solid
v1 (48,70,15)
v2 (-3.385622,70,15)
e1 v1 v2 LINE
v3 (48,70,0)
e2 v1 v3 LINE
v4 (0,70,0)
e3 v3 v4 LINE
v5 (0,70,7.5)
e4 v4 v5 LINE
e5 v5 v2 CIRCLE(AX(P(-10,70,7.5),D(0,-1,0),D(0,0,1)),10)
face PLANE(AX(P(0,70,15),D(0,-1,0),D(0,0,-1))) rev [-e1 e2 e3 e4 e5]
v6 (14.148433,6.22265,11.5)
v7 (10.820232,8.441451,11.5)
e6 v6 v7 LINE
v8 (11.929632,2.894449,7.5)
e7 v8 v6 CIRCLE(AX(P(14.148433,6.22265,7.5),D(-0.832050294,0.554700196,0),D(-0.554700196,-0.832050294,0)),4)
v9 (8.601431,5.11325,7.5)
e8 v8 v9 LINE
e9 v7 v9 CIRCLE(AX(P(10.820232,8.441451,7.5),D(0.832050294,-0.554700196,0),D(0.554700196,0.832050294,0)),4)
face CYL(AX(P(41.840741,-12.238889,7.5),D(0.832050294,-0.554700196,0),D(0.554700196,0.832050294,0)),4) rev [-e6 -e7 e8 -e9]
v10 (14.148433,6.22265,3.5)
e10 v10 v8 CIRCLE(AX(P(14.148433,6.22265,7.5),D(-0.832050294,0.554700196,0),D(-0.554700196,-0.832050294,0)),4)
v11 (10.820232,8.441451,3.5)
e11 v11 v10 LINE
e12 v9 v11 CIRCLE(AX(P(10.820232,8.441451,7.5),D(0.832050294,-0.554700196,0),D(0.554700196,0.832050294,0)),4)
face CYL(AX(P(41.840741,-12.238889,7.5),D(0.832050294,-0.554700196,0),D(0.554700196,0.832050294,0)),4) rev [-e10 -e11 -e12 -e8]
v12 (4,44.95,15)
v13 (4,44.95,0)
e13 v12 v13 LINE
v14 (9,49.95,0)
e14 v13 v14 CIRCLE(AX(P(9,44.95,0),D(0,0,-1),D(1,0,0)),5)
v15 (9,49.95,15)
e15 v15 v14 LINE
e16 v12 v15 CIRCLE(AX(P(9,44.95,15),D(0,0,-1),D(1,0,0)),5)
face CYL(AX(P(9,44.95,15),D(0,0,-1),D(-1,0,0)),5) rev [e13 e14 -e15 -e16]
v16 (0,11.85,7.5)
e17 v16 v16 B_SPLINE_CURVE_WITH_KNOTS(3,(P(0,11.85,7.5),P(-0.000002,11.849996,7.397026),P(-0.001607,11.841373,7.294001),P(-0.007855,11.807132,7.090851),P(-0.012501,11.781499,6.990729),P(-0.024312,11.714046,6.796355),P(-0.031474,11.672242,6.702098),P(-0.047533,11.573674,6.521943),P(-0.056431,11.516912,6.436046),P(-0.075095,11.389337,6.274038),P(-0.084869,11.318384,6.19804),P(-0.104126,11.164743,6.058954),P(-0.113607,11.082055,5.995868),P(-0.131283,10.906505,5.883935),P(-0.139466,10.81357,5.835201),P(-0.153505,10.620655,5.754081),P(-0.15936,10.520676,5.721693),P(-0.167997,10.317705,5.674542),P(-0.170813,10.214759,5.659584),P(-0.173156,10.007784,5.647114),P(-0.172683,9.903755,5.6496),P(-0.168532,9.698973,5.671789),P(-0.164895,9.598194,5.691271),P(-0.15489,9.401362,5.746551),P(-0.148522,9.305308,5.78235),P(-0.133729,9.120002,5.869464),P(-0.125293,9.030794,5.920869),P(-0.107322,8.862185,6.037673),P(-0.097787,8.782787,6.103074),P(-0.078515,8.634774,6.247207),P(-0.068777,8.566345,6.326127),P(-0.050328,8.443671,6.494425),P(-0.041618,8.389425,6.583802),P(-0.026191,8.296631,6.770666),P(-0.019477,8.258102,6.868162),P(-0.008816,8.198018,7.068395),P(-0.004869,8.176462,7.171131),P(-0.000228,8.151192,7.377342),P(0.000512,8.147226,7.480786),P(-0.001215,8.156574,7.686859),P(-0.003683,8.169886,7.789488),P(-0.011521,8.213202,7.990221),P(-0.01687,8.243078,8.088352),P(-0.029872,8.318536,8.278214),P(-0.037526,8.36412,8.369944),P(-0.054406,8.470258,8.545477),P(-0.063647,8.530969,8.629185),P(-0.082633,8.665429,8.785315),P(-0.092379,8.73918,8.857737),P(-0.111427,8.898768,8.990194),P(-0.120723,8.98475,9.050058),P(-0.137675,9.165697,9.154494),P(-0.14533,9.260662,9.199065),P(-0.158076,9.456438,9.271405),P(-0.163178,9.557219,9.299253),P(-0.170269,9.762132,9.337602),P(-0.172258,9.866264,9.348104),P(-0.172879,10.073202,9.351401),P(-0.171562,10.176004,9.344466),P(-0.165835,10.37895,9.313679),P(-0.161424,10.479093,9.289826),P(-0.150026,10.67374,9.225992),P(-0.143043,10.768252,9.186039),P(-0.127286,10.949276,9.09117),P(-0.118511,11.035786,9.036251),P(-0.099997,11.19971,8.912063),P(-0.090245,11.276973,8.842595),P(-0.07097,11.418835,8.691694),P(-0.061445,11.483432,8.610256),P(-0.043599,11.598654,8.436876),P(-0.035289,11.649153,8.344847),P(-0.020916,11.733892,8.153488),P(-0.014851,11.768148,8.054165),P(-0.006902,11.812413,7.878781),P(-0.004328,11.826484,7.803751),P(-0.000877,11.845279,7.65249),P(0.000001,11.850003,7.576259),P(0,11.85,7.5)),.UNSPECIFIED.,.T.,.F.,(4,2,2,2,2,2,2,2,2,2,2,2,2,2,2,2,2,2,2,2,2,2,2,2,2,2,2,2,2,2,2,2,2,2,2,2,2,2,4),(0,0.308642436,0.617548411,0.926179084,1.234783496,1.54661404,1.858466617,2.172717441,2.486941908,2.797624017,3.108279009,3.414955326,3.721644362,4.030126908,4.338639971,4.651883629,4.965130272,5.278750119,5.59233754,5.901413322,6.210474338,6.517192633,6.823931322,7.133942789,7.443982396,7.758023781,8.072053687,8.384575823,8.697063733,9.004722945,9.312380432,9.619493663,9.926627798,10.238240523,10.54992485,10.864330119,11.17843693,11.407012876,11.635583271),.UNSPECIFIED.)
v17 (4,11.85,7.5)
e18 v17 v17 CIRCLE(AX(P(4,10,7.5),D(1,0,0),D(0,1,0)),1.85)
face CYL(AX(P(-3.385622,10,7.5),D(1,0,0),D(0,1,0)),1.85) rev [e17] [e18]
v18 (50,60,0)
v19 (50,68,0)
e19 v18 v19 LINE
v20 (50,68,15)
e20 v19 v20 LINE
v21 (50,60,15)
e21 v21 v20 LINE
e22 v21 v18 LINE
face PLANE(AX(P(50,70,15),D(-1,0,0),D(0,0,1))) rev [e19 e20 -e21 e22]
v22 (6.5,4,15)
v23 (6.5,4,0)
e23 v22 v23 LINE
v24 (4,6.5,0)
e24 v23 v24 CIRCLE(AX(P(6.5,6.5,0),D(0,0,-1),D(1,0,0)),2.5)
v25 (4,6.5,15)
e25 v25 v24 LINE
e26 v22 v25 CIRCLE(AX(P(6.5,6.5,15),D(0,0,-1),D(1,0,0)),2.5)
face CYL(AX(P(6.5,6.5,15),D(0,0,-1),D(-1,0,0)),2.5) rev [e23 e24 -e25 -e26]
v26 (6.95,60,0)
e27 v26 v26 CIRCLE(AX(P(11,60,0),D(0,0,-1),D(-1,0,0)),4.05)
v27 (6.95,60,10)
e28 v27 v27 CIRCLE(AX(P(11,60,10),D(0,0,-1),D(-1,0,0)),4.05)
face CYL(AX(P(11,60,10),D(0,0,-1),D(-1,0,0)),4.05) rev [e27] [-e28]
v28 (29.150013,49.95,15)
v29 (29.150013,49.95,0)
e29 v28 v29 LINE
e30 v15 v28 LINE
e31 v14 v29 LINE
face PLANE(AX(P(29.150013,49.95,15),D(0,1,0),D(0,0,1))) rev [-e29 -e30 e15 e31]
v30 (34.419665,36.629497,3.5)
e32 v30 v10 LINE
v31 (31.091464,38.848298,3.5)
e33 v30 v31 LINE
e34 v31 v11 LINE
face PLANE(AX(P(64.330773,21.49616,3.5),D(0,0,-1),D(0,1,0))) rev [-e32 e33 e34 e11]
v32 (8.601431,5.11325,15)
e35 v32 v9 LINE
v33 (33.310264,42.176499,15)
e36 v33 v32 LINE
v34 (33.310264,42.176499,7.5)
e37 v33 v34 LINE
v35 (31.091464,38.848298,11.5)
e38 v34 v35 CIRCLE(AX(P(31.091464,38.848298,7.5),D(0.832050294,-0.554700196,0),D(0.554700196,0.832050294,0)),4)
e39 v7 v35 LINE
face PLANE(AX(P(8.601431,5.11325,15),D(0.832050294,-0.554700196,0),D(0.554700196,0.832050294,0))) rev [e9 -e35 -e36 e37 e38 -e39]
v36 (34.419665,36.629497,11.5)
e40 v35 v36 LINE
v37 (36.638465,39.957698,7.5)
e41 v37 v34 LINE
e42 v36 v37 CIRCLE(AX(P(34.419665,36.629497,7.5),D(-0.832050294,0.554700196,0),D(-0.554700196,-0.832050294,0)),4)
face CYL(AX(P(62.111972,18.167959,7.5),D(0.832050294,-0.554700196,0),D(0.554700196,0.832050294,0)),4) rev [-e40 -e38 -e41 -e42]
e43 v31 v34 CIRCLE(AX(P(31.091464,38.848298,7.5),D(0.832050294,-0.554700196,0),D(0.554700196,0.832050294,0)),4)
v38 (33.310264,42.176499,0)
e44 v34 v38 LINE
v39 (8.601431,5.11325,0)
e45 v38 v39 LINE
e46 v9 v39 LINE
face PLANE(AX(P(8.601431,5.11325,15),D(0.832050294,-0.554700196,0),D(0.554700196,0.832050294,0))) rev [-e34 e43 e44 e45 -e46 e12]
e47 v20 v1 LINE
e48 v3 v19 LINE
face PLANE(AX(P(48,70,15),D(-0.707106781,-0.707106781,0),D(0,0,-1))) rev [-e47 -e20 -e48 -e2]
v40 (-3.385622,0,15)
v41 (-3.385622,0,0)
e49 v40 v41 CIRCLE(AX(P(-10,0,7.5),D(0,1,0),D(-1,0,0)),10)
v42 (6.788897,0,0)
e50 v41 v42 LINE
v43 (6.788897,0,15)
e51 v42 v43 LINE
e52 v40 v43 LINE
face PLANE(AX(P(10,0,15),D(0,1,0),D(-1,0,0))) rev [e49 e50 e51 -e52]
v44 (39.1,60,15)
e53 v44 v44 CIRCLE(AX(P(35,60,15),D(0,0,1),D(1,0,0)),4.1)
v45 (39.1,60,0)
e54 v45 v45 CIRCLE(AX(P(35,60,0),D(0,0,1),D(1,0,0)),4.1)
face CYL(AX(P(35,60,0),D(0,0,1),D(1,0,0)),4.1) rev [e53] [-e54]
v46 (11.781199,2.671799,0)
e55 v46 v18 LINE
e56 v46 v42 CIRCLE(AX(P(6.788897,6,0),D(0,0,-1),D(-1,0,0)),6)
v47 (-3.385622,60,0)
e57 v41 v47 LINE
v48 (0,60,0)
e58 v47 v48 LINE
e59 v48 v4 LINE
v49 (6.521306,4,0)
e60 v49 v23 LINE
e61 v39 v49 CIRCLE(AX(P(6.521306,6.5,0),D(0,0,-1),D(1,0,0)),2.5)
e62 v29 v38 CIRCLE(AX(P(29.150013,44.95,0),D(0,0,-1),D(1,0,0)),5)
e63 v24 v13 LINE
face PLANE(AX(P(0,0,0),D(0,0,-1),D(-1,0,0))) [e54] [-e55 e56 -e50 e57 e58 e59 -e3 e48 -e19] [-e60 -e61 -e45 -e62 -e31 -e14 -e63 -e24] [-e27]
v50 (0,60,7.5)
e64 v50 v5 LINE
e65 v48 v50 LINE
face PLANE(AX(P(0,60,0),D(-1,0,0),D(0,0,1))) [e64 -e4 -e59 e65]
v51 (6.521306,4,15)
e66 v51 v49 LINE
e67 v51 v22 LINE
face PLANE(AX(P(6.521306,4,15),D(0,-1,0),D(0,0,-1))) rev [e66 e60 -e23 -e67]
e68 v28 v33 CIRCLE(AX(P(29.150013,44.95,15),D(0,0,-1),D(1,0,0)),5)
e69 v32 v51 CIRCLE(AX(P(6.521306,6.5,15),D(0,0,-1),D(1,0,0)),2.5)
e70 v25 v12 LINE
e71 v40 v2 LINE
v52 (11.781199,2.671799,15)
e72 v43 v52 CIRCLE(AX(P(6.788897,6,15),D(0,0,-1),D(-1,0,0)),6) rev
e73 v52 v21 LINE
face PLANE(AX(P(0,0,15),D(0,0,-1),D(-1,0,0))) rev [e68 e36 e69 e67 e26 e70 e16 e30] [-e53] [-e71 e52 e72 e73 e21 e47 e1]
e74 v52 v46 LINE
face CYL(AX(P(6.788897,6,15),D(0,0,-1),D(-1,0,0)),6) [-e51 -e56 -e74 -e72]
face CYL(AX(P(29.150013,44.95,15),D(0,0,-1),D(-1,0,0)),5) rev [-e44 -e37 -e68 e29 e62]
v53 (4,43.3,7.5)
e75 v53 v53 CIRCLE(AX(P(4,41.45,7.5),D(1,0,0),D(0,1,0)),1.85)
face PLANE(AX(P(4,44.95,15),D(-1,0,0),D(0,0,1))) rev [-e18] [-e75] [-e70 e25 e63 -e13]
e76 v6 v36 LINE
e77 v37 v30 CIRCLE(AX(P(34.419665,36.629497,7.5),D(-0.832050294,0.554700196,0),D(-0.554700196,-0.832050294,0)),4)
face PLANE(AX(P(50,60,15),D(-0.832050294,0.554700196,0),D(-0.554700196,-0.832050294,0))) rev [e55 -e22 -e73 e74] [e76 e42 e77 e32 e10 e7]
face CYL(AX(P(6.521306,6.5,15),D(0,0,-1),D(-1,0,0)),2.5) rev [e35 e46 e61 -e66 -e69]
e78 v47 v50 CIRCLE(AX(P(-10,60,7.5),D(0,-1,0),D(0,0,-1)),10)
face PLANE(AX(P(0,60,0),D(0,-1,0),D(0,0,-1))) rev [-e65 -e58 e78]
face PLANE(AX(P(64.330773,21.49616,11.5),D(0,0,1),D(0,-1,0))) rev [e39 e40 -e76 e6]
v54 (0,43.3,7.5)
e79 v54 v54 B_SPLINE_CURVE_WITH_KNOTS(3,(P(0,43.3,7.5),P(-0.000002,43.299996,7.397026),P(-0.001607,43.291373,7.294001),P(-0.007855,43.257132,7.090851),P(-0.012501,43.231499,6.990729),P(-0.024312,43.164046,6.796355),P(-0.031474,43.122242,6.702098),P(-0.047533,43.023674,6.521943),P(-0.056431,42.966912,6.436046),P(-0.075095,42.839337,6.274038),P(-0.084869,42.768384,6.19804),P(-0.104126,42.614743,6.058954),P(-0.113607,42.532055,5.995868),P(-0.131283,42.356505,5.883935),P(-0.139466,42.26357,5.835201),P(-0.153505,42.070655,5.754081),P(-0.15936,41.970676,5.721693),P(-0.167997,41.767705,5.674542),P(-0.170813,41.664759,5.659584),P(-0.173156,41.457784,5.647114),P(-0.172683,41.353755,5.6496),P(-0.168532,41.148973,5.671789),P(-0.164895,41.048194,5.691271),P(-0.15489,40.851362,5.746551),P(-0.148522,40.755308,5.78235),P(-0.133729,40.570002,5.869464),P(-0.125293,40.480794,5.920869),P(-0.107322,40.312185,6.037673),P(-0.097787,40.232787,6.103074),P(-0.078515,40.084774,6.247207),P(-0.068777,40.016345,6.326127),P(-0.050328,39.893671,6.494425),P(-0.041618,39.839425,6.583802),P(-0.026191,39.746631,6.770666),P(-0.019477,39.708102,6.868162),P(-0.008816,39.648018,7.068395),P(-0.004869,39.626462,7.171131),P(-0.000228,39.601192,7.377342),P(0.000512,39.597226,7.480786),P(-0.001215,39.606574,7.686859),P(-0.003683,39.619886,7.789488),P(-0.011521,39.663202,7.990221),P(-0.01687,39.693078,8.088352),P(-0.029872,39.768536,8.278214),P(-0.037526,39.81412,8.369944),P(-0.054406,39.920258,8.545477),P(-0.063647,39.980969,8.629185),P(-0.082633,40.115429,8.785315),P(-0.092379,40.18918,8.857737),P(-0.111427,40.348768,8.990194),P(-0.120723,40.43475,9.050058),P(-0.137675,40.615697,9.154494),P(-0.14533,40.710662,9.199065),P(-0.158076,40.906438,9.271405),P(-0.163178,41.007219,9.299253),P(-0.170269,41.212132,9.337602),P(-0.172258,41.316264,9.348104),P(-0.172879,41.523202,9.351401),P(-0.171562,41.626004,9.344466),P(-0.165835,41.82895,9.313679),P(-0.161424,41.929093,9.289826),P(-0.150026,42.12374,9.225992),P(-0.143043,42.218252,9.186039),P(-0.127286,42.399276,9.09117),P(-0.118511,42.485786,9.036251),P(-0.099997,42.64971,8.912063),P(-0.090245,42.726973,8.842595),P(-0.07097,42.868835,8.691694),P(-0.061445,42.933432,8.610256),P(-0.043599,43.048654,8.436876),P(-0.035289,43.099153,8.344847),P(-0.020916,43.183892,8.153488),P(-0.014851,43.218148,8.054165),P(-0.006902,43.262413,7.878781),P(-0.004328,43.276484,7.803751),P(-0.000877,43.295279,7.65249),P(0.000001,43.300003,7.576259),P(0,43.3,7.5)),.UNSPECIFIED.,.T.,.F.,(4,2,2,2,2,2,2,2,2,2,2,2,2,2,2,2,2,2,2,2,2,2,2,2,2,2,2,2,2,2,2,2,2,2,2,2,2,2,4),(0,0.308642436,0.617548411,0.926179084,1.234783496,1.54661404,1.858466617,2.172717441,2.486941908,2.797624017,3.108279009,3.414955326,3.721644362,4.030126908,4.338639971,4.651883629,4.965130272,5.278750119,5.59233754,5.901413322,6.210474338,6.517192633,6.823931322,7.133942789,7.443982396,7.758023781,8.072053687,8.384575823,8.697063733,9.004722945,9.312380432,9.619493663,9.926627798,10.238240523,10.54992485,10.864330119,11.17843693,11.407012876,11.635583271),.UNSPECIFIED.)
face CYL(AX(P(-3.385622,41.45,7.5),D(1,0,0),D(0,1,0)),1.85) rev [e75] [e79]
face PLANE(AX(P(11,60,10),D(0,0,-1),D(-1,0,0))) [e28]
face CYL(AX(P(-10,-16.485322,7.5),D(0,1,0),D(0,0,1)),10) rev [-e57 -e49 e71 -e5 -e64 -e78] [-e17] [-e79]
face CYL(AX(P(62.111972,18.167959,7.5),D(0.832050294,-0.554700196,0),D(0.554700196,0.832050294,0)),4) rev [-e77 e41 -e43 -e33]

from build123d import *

# Parameters (mm, degrees)
P_IDAT_VYSUNUT_M1_DEPTH  = 15
SKICA3_R                 = 4.1
ODEBRAT_VYSUNUT_M1_DEPTH = 88.321245983
SKICA4_R                 = 4.05
ODEBRAT_VYSUNUT_M2_DEPTH = 10
ODEBRAT_VYSUNUT_M3_DEPTH = 88.321245983
P_IDAT_VYSUNUT_M2_DEPTH  = 70
SKICA7_W                 = 3.385621722
SKICA7_H                 = 7.5
ODEBRAT_VYSUNUT_M5_DEPTH = 10
SKICA9_W                 = 8
SKICA9_H                 = 44.544482181
ODEBRAT_VYSUNUT_M6_DEPTH = 88.290898193
ZAOBLIT2_R               = 4
SKICA10_R                = 1.85
ODEBRAT_VYSUNUT_M7_DEPTH = 86.094065598
ZAOBLIT7_R               = 6
ZKOSEN_1_SIZE            = 2


with BuildPart() as part:
    # Skica1 → Přidat vysunutím1 (new body)
    with BuildSketch(Plane.XY):
        Polygon((0, 0), (0, 70), (50, 70), (50, 60), (10, 0), align=None)
    extrude(amount=P_IDAT_VYSUNUT_M1_DEPTH)

    # Skica3 → Odebrat vysunutím1 (cut, through all)
    with BuildSketch(Plane.XY.offset(15)):
        with Locations((35, 60)):
            Circle(SKICA3_R)
    extrude(amount=-ODEBRAT_VYSUNUT_M1_DEPTH, mode=Mode.SUBTRACT)

    # Skica4 → Odebrat vysunutím2 (cut)
    with BuildSketch(Plane(origin=(0, 0, 0), x_dir=(-1, 0, 0), z_dir=(0, 0, -1))):
        with Locations((-11, 60)):
            Circle(SKICA4_R)
    extrude(amount=-ODEBRAT_VYSUNUT_M2_DEPTH, mode=Mode.SUBTRACT)

    # Skica5 → Odebrat vysunutím3 (cut, through all)
    with BuildSketch(Plane(origin=(0, 0, 0), x_dir=(-1, 0, 0), z_dir=(0, 0, -1))):
        with BuildLine():
            Line((-29.15001284, 49.95), (-9, 49.95))
            ThreePointArc((-9, 49.95), (-5.464466094, 48.485533906), (-4, 44.95))
            Line((-4, 44.95), (-4, 6.5))
            ThreePointArc((-4, 6.5), (-4.732233047, 4.732233047), (-6.5, 4))
            Line((-6.5, 4), (-6.52130557, 4))
            ThreePointArc((-6.52130557, 4), (-7.700950384, 4.295813503), (-8.601431306, 5.113249509))
            Line((-8.601431306, 5.113249509), (-33.310264312, 42.176499019))
            ThreePointArc((-33.310264312, 42.176499019), (-33.558385834, 47.309289628), (-29.15001284, 49.95))
        make_face()
    extrude(amount=-ODEBRAT_VYSUNUT_M3_DEPTH, mode=Mode.SUBTRACT)

    # Skica6 → Přidat vysunutím2 (add)
    with BuildSketch(Plane(origin=(0, 70, 0), x_dir=(1, 0, 0), z_dir=(0, 1, 0))):
        with BuildLine():
            Line((3.452933226, 0), (3.452933226, -15))
            Line((3.452933226, -15), (-3.385621722, -15))
            ThreePointArc((-3.385621722, -15), (0, -7.5), (-3.385621722, 0))
            Line((-3.385621722, 0), (3.452933226, 0))
        make_face()
    extrude(amount=-P_IDAT_VYSUNUT_M2_DEPTH)

    # Skica7 → Odebrat vysunutím5 (cut)
    with BuildSketch(Plane(origin=(0, 70, 0), x_dir=(1, 0, 0), z_dir=(0, 1, 0))):
        with Locations((-1.692810861, -3.75)):
            Rectangle(SKICA7_W, SKICA7_H)
    extrude(amount=-ODEBRAT_VYSUNUT_M5_DEPTH, mode=Mode.SUBTRACT)

    # Skica9 → Odebrat vysunutím6 (cut, through all)
    with BuildSketch(Plane(origin=(3.594875746, -2.39658383, 0), x_dir=(0, 0, 1), z_dir=(-0.8320502943378435, 0.5547001962252294, 0))):
        with Locations((7.5, 31.297937483)):
            Rectangle(SKICA9_W, SKICA9_H)
    extrude(amount=-ODEBRAT_VYSUNUT_M6_DEPTH, mode=Mode.SUBTRACT)

    # Zaoblit2
    zaoblit2_edges = [part.edges().sort_by_distance(p)[0] for p in [
        (10.265531894, 4.003849117, 11.5),
        (10.265531894, 4.003849117, 3.5),
        (34.974364901, 41.067098626, 3.5),
        (34.974364901, 41.067098626, 11.5),
    ]]
    fillet(zaoblit2_edges, radius=ZAOBLIT2_R - 0.0001)  # a hair under: the kernel refuses the full size

    # Skica10 → Odebrat vysunutím7 (cut, through all)
    with BuildSketch(Plane(origin=(4, 0, 0), x_dir=(0, 0, -1), z_dir=(1, 0, 0))):
        with Locations(Location((-7.5, 10, 0), (0, 0, 90))):
            Circle(SKICA10_R)
        with Locations(Location((-7.5, 41.45, 0), (0, 0, 90))):
            Circle(SKICA10_R)
    extrude(amount=-ODEBRAT_VYSUNUT_M7_DEPTH, mode=Mode.SUBTRACT)

    # Zaoblit7
    zaoblit7_edges = [part.edges().sort_by_distance(p)[0] for p in [
        (10, 0, 7.5),
    ]]
    fillet(zaoblit7_edges, radius=ZAOBLIT7_R)

    # Zkosení1
    zkosen_1_edges = [part.edges().sort_by_distance(p)[0] for p in [
        (50, 70, 7.5),
    ]]
    chamfer(zkosen_1_edges, length=ZKOSEN_1_SIZE)


solid = part.part
